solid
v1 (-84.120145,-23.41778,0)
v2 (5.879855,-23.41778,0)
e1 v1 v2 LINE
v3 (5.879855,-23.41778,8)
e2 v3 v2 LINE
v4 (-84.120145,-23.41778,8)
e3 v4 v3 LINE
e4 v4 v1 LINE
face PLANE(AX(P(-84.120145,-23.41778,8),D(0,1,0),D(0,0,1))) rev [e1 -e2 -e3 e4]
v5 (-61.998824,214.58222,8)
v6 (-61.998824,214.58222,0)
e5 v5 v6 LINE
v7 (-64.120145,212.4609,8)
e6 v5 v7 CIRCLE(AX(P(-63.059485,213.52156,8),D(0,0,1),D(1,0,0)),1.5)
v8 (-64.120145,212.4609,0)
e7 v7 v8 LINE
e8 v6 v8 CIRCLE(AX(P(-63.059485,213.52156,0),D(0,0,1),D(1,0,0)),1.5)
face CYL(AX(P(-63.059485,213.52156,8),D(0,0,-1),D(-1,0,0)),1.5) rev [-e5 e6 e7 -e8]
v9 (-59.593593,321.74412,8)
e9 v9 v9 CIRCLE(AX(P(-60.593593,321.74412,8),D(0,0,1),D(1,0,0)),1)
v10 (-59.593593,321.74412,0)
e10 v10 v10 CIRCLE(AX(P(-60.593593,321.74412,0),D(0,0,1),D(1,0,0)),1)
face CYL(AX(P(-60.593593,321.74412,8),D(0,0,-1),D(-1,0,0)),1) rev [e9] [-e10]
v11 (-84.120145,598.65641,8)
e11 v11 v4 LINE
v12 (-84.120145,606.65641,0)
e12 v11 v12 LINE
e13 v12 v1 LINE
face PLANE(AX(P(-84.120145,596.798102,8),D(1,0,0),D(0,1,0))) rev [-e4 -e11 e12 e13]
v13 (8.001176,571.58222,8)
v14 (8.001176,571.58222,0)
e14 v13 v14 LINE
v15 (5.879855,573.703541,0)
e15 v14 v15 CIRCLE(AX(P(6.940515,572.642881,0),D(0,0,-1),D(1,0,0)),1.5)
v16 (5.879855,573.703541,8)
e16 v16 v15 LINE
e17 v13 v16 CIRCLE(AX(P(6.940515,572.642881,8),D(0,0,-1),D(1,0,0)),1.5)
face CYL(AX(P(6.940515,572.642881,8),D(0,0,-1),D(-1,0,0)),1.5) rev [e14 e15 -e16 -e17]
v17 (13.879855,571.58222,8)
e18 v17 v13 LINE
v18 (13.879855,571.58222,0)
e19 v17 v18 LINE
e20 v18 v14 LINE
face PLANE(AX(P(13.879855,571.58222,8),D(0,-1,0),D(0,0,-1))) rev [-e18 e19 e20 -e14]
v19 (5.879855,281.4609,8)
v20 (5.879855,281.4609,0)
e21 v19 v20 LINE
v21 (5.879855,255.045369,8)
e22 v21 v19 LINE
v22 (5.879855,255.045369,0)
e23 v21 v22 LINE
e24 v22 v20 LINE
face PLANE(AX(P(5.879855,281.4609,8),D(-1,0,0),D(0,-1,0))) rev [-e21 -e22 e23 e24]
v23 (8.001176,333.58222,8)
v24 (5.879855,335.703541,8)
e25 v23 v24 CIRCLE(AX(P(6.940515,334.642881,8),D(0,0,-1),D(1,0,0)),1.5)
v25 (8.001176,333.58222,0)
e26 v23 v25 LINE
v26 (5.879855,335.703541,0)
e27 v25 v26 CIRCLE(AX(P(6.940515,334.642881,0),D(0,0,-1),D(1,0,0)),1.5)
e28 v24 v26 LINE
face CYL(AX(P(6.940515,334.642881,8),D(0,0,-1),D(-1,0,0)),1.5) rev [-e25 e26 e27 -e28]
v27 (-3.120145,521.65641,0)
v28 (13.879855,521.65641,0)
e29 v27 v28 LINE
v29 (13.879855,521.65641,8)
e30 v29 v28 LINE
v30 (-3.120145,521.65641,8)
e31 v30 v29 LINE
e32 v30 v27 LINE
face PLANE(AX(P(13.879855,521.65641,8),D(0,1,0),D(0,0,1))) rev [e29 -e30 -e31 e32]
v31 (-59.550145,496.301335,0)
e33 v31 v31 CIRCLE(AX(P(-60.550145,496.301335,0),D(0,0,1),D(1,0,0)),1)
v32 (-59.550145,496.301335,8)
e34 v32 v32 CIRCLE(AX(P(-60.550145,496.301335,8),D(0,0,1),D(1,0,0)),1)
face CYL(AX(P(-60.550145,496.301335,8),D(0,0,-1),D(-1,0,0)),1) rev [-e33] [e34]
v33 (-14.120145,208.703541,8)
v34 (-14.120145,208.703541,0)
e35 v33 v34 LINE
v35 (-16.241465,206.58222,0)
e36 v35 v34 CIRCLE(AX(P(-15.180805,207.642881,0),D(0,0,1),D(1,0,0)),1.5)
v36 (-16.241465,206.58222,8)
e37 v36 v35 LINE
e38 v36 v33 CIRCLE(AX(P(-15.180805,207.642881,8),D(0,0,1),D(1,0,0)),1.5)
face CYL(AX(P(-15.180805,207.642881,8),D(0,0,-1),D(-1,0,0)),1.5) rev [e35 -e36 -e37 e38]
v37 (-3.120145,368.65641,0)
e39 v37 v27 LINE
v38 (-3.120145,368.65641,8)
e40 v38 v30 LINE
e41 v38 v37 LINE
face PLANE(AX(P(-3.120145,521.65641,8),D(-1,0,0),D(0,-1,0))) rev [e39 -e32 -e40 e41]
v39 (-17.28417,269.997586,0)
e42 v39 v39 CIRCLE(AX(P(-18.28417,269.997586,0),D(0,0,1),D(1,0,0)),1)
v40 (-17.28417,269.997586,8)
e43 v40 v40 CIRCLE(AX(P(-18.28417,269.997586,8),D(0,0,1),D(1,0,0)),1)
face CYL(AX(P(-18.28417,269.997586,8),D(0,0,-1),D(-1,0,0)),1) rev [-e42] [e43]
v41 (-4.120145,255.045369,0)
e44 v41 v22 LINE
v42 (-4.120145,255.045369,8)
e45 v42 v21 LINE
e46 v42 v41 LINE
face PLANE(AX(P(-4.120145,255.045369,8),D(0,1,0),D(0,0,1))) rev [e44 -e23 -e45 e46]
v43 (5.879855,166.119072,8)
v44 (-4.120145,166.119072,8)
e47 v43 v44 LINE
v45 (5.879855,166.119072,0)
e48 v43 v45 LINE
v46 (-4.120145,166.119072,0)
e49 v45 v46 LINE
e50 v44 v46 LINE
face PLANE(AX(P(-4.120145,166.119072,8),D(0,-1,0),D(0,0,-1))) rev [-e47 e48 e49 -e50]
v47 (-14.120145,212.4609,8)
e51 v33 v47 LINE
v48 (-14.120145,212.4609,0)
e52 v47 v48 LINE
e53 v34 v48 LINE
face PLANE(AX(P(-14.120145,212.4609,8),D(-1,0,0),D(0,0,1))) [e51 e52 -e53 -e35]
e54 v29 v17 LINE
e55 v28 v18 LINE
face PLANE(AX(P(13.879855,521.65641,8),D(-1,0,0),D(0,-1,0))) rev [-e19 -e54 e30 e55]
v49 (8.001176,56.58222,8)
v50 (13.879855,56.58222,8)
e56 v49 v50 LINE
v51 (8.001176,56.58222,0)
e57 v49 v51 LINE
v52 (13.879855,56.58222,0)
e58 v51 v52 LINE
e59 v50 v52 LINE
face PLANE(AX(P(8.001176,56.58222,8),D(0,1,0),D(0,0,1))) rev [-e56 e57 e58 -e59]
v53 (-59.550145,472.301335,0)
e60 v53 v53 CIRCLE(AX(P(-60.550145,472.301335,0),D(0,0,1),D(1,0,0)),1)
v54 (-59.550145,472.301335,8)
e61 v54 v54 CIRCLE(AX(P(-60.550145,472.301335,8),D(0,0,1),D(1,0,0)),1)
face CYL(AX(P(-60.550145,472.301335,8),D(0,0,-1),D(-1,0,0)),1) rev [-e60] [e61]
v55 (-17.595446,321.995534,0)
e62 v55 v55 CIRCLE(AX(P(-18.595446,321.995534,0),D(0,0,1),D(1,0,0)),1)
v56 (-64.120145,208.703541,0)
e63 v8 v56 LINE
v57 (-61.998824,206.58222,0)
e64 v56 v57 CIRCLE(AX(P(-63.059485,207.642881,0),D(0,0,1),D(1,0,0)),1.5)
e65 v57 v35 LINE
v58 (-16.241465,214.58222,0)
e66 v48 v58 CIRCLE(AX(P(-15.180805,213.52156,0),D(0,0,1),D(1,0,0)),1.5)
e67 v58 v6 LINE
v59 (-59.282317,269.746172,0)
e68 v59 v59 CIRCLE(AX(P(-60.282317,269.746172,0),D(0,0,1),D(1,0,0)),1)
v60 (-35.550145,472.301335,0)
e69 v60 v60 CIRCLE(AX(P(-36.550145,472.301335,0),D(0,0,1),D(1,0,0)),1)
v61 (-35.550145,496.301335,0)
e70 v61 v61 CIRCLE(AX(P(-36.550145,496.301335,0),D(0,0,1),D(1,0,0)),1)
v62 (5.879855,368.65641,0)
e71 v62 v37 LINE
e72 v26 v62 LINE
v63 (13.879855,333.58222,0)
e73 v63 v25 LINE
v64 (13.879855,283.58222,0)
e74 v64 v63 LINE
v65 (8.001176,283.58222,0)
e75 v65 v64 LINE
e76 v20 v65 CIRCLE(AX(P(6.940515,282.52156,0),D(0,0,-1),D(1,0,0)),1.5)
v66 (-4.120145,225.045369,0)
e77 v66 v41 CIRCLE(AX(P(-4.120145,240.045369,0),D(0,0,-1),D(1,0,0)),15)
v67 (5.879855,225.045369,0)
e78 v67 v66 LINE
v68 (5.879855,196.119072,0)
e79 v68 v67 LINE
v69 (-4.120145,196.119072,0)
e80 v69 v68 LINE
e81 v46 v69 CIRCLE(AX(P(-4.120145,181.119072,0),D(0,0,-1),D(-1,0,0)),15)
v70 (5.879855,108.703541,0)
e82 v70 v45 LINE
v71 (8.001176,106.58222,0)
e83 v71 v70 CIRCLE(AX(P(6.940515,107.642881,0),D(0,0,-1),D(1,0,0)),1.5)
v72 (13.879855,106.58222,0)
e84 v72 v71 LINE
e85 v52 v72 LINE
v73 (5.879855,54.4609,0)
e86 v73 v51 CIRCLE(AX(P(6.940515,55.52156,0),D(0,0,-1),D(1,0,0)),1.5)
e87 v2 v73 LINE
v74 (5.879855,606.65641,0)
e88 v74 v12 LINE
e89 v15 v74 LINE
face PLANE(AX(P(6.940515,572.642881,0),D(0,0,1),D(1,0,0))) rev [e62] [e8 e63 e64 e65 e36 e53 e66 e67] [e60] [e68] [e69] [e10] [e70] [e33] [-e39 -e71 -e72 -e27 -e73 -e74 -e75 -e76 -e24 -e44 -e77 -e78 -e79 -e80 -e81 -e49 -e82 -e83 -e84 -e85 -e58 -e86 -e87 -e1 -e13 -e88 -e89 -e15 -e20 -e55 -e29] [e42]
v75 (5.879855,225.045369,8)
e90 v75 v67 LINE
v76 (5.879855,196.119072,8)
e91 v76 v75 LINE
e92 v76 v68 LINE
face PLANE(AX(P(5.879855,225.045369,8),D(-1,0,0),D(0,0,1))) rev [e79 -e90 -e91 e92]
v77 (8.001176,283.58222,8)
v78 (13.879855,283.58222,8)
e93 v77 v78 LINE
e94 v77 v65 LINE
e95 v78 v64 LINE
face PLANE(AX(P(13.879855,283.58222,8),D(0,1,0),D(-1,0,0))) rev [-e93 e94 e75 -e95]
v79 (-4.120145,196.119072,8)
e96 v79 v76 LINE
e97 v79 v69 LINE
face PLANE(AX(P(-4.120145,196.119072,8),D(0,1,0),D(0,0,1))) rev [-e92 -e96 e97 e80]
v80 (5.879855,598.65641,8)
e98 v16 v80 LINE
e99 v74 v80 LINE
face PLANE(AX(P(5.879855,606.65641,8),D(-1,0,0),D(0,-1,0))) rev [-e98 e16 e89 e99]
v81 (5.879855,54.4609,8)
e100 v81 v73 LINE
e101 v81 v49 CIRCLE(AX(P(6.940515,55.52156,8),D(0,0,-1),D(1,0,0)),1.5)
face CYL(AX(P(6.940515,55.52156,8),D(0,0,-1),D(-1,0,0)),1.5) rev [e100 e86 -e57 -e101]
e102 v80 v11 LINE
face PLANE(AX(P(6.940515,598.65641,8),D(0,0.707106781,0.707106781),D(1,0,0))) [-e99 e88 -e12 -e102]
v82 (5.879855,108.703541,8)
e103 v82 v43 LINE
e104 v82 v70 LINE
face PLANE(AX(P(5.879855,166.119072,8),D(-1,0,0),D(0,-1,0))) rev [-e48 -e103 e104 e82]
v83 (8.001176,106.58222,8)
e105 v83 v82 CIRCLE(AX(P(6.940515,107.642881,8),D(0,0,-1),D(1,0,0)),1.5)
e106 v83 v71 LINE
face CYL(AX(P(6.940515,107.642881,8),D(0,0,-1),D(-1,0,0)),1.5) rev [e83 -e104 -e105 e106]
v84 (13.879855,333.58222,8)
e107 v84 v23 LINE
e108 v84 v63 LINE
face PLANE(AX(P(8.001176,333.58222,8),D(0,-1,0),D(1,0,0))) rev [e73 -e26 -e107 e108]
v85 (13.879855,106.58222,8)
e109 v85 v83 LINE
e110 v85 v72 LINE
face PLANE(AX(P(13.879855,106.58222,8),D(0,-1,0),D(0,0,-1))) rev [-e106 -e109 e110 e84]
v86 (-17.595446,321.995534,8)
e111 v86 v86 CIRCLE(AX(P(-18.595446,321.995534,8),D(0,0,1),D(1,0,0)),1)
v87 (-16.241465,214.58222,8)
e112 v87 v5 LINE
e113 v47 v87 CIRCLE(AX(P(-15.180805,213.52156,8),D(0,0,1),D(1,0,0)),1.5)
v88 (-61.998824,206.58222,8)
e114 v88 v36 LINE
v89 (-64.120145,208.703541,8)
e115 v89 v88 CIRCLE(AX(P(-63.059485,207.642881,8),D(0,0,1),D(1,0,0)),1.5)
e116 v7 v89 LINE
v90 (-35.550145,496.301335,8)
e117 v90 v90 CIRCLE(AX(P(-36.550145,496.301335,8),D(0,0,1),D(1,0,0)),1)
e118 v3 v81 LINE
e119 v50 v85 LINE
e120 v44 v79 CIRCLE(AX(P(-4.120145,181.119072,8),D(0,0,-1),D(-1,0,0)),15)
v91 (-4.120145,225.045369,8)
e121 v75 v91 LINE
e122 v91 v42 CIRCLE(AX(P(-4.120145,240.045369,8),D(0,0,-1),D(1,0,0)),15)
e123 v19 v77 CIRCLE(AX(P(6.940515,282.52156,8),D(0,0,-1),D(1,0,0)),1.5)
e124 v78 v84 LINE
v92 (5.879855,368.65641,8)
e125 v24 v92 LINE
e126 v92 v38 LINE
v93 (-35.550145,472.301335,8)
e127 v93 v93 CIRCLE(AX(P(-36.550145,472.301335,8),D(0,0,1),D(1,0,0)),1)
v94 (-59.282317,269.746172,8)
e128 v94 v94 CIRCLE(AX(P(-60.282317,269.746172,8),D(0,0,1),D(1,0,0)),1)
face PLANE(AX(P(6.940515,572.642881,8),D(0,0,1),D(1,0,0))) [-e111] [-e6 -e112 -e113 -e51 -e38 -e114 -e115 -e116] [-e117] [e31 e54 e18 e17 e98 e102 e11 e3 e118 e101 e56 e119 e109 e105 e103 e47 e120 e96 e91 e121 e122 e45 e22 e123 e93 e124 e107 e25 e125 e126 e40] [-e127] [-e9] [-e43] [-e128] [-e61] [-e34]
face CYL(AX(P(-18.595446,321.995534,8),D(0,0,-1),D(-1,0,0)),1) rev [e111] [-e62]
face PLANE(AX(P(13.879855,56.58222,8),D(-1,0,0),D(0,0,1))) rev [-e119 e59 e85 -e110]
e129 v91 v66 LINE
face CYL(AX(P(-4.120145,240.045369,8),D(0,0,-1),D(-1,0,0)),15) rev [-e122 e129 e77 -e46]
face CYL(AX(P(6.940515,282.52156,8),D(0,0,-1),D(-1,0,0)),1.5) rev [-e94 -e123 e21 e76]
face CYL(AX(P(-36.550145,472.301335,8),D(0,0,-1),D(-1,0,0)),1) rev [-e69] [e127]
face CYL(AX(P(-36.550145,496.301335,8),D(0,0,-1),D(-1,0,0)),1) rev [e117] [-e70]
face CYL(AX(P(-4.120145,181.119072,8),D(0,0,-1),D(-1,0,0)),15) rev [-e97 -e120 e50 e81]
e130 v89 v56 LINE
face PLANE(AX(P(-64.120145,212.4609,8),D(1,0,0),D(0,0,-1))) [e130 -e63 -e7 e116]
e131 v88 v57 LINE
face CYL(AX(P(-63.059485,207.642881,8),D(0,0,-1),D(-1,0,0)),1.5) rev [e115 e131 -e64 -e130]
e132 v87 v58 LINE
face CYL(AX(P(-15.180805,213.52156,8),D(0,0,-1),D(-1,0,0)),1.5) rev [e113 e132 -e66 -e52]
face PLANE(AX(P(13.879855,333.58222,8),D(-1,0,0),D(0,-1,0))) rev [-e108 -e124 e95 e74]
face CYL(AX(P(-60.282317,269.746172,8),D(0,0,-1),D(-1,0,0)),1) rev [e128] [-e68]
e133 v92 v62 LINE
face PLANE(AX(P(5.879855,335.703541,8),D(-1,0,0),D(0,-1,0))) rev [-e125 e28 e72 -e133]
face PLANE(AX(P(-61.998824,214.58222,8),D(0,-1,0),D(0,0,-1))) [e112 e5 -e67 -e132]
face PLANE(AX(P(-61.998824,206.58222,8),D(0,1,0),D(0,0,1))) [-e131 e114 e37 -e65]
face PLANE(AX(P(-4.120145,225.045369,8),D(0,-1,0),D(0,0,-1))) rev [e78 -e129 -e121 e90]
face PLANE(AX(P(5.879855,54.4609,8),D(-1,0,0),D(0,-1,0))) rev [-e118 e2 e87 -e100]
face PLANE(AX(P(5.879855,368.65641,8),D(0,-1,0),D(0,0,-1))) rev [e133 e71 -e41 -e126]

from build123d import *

# Parameters (mm, degrees)
ESQUISSE1_R        = 1
BOSS_EXTRU_1_DEPTH = 8
CHANFREIN1_SIZE    = 8


with BuildPart() as part:
    # Esquisse1 → Boss.-Extru.1 (new body)
    with BuildSketch(Plane.XY):
        with BuildLine():
            Line((5.879855223, 335.703540816), (5.879855223, 368.656410216))
            Line((5.879855223, 368.656410216), (-3.120144777, 368.656410216))
            Line((-3.120144777, 368.656410216), (-3.120144777, 521.656410212))
            Line((-3.120144777, 521.656410212), (13.879855223, 521.656410212))
            Line((13.879855223, 521.656410212), (13.879855223, 571.582220472))
            Line((13.879855223, 571.582220472), (8.001175566, 571.582220472))
            ThreePointArc((8.001175566, 571.582220472), (5.879855223, 571.582220472), (5.879855223, 573.703540816))
            Line((5.879855223, 573.703540816), (5.879855223, 596.798102411))
            Line((5.879855223, 596.798102411), (5.879855223, 606.656410212))
            Line((5.879855223, 606.656410212), (-84.120144777, 606.656410212))
            Line((-84.120144777, 606.656410212), (-84.120144777, 596.798102411))
            Line((-84.120144777, 596.798102411), (-84.120144777, -23.417779528))
            Line((-84.120144777, -23.417779528), (5.879855223, -23.417779528))
            Line((5.879855223, -23.417779528), (5.879855223, 54.460900128))
            ThreePointArc((5.879855223, 54.460900128), (5.879855223, 56.582220472), (8.001175566, 56.582220472))
            Line((8.001175566, 56.582220472), (13.879855223, 56.582220472))
            Line((13.879855223, 56.582220472), (13.879855223, 106.582220472))
            Line((13.879855223, 106.582220472), (8.001175566, 106.582220472))
            ThreePointArc((8.001175566, 106.582220472), (5.879855223, 106.582220472), (5.879855223, 108.703540816))
            Line((5.879855223, 108.703540816), (5.879855223, 166.119071534))
            Line((5.879855223, 166.119071534), (-4.120144777, 166.119071534))
            ThreePointArc((-4.120144777, 166.119071534), (-19.120144777, 181.119071534), (-4.120144777, 196.119071534))
            Line((-4.120144777, 196.119071534), (5.879855223, 196.119071534))
            Line((5.879855223, 196.119071534), (5.879855223, 225.04536941))
            Line((5.879855223, 225.04536941), (-4.120144777, 225.04536941))
            ThreePointArc((-4.120144777, 225.04536941), (-19.120144777, 240.04536941), (-4.120144777, 255.04536941))
            Line((-4.120144777, 255.04536941), (5.879855223, 255.04536941))
            Line((5.879855223, 255.04536941), (5.879855223, 281.460900128))
            ThreePointArc((5.879855223, 281.460900128), (5.879855223, 283.582220472), (8.001175566, 283.582220472))
            Line((8.001175566, 283.582220472), (13.879855223, 283.582220472))
            Line((13.879855223, 283.582220472), (13.879855223, 333.582220472))
            Line((13.879855223, 333.582220472), (8.001175566, 333.582220472))
            ThreePointArc((8.001175566, 333.582220472), (5.879855223, 333.582220472), (5.879855223, 335.703540816))
        make_face()
        with Locations((-60.550144777, 496.30133456)):
            Circle(ESQUISSE1_R, mode=Mode.SUBTRACT)
        with Locations((-36.550144777, 496.30133456)):
            Circle(ESQUISSE1_R, mode=Mode.SUBTRACT)
        with Locations((-60.550144777, 472.30133456)):
            Circle(ESQUISSE1_R, mode=Mode.SUBTRACT)
        with Locations((-36.550144777, 472.30133456)):
            Circle(ESQUISSE1_R, mode=Mode.SUBTRACT)
        with Locations((-60.593593351, 321.744120307)):
            Circle(ESQUISSE1_R, mode=Mode.SUBTRACT)
        with Locations((-18.595445866, 321.995534365)):
            Circle(ESQUISSE1_R, mode=Mode.SUBTRACT)
        with Locations((-18.28416987, 269.997586055)):
            Circle(ESQUISSE1_R, mode=Mode.SUBTRACT)
        with Locations((-60.282317355, 269.746171996)):
            Circle(ESQUISSE1_R, mode=Mode.SUBTRACT)
        with BuildLine():
            Line((-61.998824434, 214.582220472), (-16.241465121, 214.582220472))
            ThreePointArc((-16.241465121, 214.582220472), (-14.120144777, 214.582220472), (-14.120144777, 212.460900128))
            Line((-14.120144777, 212.460900128), (-14.120144777, 208.703540816))
            ThreePointArc((-14.120144777, 208.703540816), (-14.120144777, 206.582220472), (-16.241465121, 206.582220472))
            Line((-16.241465121, 206.582220472), (-61.998824434, 206.582220472))
            ThreePointArc((-61.998824434, 206.582220472), (-64.120144777, 206.582220472), (-64.120144777, 208.703540816))
            Line((-64.120144777, 208.703540816), (-64.120144777, 212.460900128))
            ThreePointArc((-64.120144777, 212.460900128), (-64.120144777, 214.582220472), (-61.998824434, 214.582220472))
        make_face(mode=Mode.SUBTRACT)
    extrude(amount=BOSS_EXTRU_1_DEPTH)

    # Chanfrein1
    chanfrein1_edges = [part.edges().sort_by_distance(p)[0] for p in [
        (-39.120144777, 606.656410212, 8),
    ]]
    chamfer(chanfrein1_edges, length=CHANFREIN1_SIZE - 0.0001)  # a hair under: the kernel refuses the full size


solid = part.part
